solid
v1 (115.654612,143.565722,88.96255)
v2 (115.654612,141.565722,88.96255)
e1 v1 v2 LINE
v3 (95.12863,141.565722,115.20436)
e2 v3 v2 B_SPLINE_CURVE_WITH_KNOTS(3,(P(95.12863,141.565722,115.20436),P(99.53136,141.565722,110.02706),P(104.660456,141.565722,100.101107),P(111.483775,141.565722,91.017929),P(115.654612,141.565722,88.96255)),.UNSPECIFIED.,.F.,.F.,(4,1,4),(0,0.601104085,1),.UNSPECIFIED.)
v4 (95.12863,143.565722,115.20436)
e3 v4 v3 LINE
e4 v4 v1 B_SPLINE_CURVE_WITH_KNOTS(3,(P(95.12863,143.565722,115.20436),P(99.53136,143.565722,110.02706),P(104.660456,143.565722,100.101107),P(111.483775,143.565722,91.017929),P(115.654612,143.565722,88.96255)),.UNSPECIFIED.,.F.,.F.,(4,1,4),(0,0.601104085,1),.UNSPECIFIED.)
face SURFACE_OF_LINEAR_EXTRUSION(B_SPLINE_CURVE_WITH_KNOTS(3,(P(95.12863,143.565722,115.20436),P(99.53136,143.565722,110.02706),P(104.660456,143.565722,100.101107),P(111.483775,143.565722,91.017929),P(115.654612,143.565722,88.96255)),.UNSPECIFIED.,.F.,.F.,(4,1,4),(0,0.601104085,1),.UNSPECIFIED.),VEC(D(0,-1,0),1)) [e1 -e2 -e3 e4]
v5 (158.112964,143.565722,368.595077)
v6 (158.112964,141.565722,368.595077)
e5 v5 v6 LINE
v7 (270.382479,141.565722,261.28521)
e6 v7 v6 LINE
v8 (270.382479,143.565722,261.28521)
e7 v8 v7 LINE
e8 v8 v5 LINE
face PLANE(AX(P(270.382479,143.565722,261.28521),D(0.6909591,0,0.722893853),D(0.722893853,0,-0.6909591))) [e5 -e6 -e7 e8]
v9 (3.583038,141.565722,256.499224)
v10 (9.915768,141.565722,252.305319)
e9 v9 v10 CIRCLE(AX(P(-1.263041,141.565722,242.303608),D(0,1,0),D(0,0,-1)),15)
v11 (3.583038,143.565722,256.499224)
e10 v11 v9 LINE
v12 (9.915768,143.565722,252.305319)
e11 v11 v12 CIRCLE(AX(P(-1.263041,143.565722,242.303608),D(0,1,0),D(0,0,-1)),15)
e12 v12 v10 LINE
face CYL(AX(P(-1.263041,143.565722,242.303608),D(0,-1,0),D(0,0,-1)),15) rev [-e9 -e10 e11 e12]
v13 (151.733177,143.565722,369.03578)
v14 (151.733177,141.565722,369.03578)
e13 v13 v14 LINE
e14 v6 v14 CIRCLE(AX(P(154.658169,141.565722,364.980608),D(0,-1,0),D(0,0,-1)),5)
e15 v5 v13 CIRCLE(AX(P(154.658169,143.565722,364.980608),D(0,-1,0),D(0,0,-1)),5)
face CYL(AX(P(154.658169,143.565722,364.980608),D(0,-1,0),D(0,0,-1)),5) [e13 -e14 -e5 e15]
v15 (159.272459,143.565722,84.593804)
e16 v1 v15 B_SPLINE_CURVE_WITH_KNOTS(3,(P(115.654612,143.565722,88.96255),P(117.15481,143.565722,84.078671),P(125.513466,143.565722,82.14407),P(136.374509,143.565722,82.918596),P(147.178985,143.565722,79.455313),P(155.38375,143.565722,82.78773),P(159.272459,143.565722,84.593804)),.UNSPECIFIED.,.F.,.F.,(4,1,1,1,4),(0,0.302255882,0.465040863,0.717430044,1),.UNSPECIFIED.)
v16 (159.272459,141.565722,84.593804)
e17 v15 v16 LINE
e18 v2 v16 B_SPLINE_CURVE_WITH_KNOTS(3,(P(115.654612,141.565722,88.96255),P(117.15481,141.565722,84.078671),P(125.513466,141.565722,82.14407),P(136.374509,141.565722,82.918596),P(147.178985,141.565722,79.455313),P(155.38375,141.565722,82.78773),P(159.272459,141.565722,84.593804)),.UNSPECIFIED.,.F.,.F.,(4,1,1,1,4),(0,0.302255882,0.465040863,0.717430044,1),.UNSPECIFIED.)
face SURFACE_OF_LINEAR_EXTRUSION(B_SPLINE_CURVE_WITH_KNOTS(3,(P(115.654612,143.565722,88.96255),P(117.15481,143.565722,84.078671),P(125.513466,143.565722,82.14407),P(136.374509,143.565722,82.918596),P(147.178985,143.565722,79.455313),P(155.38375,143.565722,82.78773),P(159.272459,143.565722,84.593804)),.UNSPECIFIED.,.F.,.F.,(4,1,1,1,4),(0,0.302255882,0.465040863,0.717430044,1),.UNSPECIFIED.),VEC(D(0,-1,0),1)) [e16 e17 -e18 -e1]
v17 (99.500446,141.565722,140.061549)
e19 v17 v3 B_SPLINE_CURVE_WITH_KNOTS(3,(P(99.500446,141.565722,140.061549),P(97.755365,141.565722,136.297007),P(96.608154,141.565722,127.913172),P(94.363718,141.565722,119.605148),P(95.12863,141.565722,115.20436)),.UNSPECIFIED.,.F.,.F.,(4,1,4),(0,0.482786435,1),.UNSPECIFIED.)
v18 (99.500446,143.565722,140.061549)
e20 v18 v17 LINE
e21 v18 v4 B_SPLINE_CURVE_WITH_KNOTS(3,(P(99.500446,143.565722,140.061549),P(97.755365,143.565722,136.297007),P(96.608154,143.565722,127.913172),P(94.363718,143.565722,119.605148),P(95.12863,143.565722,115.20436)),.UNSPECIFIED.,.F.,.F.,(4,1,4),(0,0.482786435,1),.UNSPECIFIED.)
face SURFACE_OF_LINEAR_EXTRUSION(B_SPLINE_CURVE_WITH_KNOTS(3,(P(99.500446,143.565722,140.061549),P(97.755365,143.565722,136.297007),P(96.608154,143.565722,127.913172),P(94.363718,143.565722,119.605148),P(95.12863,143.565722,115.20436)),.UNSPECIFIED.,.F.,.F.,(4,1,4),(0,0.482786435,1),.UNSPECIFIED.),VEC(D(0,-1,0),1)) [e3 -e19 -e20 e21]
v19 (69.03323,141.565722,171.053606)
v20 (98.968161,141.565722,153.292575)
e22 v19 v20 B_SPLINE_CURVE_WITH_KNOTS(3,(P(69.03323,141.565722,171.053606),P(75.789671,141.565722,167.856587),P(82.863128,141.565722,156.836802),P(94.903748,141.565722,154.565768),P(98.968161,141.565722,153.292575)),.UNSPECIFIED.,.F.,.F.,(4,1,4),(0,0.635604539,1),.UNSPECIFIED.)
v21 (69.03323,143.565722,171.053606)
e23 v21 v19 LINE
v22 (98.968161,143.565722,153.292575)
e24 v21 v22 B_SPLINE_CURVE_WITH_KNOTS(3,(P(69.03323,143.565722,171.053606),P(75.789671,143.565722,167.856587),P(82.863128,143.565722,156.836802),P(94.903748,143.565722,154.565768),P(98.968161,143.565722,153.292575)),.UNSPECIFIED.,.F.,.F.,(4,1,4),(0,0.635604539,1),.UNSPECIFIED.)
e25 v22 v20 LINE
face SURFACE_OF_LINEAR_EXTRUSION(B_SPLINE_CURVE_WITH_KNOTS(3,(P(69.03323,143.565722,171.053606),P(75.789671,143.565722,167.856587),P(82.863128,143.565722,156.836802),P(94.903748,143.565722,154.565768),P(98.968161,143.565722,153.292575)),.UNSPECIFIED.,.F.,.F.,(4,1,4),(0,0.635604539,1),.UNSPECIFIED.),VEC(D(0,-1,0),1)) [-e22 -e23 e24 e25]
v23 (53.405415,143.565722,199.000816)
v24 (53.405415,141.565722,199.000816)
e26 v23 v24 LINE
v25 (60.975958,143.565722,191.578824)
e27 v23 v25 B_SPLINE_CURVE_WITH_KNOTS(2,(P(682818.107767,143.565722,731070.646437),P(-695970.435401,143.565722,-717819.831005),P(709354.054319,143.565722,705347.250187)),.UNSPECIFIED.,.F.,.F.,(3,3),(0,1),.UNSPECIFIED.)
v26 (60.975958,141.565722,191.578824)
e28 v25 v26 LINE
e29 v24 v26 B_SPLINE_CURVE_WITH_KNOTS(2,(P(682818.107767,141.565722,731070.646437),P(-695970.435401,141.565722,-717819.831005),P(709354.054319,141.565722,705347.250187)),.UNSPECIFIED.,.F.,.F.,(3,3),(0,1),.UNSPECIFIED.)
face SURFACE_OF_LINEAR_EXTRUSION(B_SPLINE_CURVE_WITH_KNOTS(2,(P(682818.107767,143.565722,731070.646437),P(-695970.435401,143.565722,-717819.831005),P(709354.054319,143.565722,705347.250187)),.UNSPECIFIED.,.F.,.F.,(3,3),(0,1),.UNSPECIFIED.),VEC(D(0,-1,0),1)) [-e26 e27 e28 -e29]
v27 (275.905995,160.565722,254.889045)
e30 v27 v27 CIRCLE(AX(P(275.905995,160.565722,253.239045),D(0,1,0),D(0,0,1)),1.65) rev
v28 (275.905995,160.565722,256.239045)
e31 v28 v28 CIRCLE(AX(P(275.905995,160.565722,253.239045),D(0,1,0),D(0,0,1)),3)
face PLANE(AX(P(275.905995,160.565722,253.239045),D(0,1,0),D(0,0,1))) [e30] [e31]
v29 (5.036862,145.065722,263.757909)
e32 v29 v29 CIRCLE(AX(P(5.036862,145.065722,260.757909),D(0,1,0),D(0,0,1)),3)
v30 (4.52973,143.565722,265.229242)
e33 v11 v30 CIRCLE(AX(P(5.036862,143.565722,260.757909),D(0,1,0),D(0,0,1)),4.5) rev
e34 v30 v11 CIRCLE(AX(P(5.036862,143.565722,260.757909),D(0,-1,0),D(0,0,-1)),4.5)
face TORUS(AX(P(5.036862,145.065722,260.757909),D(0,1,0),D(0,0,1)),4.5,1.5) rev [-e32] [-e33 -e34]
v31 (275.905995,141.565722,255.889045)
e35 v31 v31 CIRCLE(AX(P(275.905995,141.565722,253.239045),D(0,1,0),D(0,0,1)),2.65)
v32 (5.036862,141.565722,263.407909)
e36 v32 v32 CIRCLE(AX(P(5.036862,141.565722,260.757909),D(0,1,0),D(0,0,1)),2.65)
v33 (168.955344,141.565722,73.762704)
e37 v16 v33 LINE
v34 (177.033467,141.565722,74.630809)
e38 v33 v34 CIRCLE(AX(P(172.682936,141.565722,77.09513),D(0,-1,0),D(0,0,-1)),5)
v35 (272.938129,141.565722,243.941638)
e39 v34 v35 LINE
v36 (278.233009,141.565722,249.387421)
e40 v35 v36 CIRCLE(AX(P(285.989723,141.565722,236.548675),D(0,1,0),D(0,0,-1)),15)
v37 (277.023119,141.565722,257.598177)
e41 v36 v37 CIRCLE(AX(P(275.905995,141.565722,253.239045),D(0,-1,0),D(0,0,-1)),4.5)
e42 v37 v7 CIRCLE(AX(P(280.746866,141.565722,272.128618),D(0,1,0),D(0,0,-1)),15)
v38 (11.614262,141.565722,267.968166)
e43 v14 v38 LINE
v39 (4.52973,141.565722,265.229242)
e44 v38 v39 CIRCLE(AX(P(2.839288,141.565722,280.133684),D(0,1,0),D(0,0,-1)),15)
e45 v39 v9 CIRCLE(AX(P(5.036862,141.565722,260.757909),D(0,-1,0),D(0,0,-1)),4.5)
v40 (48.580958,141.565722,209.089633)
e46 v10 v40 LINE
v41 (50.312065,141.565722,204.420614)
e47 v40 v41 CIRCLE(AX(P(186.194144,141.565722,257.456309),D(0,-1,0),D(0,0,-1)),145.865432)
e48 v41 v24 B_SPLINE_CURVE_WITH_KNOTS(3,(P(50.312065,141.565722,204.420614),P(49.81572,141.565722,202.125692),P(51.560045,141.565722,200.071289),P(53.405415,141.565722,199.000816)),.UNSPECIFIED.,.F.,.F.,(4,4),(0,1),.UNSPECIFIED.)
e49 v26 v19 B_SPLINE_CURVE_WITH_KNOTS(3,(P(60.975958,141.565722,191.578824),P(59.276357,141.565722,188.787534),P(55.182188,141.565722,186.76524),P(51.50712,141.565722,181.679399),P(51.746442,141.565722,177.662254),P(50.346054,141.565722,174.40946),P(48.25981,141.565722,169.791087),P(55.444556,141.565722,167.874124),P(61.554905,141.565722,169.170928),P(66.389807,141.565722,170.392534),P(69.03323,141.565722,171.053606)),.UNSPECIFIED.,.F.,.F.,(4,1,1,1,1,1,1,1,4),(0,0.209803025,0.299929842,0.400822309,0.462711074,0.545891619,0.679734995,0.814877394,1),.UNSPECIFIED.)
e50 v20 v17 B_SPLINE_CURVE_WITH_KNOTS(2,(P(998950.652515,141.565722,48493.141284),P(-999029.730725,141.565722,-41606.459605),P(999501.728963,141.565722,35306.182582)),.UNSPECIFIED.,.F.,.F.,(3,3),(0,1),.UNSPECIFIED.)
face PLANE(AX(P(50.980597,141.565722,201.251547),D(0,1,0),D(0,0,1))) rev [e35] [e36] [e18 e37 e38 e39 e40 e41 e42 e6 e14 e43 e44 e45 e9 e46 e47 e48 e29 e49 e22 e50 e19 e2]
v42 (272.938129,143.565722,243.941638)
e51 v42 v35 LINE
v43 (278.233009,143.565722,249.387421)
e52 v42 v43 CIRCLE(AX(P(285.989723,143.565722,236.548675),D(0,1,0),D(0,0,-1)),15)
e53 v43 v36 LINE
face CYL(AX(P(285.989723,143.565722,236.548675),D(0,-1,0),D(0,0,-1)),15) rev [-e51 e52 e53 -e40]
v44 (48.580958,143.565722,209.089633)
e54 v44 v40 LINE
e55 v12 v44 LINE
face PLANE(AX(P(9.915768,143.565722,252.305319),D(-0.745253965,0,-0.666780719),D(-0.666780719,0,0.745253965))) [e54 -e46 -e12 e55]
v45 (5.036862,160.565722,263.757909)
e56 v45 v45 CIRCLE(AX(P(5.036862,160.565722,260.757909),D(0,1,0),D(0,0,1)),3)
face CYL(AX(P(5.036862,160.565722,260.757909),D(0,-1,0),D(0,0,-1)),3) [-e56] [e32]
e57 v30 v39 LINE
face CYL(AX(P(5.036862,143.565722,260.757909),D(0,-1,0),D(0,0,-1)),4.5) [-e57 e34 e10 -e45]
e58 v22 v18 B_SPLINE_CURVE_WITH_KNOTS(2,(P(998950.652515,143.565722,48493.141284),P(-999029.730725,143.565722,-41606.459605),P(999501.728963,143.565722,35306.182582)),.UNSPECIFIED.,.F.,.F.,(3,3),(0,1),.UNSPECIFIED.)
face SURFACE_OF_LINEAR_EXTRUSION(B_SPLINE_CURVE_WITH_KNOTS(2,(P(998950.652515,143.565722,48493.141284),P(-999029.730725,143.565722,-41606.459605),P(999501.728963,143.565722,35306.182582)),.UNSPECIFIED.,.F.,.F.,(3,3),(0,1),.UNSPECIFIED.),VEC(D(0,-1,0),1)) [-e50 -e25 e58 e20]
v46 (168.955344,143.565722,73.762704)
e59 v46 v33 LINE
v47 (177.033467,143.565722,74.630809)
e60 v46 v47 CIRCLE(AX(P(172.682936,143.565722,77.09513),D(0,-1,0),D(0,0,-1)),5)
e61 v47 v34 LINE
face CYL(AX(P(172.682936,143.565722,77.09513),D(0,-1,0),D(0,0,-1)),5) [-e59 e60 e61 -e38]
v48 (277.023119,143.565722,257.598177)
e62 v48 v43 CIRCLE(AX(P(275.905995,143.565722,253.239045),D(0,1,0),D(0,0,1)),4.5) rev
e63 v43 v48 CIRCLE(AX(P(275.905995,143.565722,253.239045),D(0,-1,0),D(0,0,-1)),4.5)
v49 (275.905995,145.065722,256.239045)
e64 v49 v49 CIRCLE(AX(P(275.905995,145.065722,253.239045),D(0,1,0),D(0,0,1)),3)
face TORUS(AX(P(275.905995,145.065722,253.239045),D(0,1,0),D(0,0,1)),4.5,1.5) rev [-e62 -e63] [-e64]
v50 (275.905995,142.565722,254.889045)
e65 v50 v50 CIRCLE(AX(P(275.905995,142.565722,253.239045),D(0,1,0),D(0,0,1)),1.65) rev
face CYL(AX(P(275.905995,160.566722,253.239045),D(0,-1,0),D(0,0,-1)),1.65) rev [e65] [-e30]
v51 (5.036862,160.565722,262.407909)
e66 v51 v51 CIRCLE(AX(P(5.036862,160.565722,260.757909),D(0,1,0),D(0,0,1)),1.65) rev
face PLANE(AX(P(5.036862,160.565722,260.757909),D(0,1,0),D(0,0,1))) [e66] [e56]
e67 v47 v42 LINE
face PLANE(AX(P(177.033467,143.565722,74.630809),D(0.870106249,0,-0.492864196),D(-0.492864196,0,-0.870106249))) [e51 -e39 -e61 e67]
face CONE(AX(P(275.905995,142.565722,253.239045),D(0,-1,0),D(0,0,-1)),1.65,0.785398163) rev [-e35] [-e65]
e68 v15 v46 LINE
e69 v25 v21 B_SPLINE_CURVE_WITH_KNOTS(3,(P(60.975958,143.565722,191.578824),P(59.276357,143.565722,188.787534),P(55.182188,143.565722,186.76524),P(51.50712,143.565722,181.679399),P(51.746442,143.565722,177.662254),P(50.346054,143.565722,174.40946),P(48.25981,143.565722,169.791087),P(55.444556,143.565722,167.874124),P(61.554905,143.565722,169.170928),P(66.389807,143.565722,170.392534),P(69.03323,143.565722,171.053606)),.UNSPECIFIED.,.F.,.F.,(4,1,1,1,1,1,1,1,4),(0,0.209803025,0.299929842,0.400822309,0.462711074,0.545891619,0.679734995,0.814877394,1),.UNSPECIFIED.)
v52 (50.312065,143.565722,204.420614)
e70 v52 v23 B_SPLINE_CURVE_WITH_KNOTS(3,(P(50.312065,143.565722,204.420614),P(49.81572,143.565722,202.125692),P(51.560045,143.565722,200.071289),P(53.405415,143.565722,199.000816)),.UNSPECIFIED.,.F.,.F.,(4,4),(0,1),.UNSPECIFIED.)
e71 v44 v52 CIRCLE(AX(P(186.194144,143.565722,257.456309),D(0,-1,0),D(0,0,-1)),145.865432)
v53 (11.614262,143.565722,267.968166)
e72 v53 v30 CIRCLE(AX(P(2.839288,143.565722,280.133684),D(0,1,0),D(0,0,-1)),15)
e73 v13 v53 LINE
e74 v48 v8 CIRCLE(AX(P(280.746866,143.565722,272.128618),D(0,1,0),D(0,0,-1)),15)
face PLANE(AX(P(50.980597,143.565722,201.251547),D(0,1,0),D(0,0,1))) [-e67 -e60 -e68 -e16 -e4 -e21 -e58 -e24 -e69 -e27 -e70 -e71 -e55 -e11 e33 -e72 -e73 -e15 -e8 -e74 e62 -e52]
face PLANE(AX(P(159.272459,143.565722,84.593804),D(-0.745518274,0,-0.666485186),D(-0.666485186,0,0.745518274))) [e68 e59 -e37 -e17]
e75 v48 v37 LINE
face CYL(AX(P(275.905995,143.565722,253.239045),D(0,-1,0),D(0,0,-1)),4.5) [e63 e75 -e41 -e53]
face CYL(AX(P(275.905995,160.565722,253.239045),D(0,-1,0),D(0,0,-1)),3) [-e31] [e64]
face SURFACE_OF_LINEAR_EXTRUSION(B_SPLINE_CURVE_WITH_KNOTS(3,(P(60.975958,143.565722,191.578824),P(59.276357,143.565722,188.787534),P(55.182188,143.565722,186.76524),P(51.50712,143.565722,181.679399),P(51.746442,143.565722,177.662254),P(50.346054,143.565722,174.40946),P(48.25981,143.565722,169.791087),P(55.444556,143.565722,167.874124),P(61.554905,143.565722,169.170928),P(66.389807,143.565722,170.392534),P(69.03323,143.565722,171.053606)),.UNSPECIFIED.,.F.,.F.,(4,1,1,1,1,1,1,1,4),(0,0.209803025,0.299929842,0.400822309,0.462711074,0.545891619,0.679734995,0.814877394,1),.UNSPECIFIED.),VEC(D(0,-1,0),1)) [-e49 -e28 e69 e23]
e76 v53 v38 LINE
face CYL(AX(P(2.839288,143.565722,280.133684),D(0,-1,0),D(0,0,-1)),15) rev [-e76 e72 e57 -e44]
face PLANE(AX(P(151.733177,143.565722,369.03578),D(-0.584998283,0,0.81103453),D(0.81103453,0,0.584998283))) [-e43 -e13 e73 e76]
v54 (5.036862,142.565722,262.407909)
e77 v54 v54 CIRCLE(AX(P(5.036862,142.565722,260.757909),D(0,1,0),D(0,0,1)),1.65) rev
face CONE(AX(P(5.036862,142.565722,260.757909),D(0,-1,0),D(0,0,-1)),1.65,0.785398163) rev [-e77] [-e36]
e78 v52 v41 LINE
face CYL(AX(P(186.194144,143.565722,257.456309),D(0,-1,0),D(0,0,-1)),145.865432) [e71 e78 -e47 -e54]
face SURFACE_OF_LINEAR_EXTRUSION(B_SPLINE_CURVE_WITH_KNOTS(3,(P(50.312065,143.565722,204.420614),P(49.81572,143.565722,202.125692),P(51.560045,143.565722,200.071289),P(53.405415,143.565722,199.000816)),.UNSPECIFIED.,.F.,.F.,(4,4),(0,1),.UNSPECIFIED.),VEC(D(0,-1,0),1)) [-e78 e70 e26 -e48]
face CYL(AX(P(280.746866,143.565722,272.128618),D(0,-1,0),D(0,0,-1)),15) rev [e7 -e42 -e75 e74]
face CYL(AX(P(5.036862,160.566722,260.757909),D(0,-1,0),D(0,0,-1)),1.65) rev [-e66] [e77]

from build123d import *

# Parameters (mm, degrees)
BOSS_EXTRUDE1_DEPTH = 2
SKETCH4_R           = 3
BOSS_EXTRUDE2_DEPTH = 17
FILLET1_R           = 1.5
CUT_EXTRUDE1_REACH  = 466.623
SKETCH5_R           = 1.65
CHAMFER1_SIZE       = 1


with BuildPart() as part:
    # Sketch2 → Boss-Extrude1 (new body)
    with BuildSketch(Plane.XZ.offset(-141.565722281)):
        with BuildLine():
            Line((9.91576806, 252.305318894), (48.580957851, 209.08963313))
            ThreePointArc((48.580957851, 209.08963313), (49.426585926, 206.74773582), (50.312065062, 204.420613874))
            add(Edge.make_bspline(
                [(50.312065062, 204.420613874), (49.815719925, 202.125692192), (51.560044766, 200.071289123), (53.405414889, 199.000816343)],
                knots=[0, 0, 0, 0, 1, 1, 1, 1], degree=3))
            add(Edge.make_bspline(
                [(53.405414889, 199.000816343), (57.076134247, 195.171649715), (60.975957758, 191.578824181)],
                knots=[0, 0, 0, 1, 1, 1], degree=2))
            add(Edge.make_bspline(
                [(60.975957758, 191.578824181), (59.276356799, 188.787533968), (55.182188202, 186.765240329), (51.507120094, 181.679398586), (51.746441808, 177.662253704), (50.346054048, 174.409460226), (48.259810349, 169.791087363), (55.44455623, 167.87412447), (61.554904622, 169.170927623), (66.389807102, 170.392534118), (69.033229794, 171.05360611)],
                knots=[0, 0, 0, 0, 0.209803025, 0.299929842, 0.400822309, 0.462711074, 0.545891619, 0.679734995, 0.814877394, 1, 1, 1, 1], degree=3))
            add(Edge.make_bspline(
                [(69.033229794, 171.05360611), (75.789670793, 167.856586879), (82.863128392, 156.836801796), (94.903748146, 154.565768109), (98.968161166, 153.292574822)],
                knots=[0, 0, 0, 0, 0.635604539, 1, 1, 1, 1], degree=3))
            add(Edge.make_bspline(
                [(98.968161166, 153.292574822), (97.222932023, 146.593007734), (99.500446297, 140.061549094)],
                knots=[0, 0, 0, 1, 1, 1], degree=2))
            add(Edge.make_bspline(
                [(99.500446297, 140.061549094), (97.755365245, 136.29700673), (96.608153873, 127.913172296), (94.363718049, 119.605147548), (95.128629781, 115.204359992)],
                knots=[0, 0, 0, 0, 0.482786435, 1, 1, 1, 1], degree=3))
            add(Edge.make_bspline(
                [(95.128629781, 115.204359992), (99.531359662, 110.027059936), (104.66045627, 100.101106742), (111.48377488, 91.017928675), (115.654612237, 88.962550112)],
                knots=[0, 0, 0, 0, 0.601104085, 1, 1, 1, 1], degree=3))
            add(Edge.make_bspline(
                [(115.654612237, 88.962550112), (117.154809763, 84.078670542), (125.513466275, 82.144069756), (136.374508774, 82.918595796), (147.178985025, 79.455312781), (155.38375, 82.787729708), (159.272458823, 84.593804464)],
                knots=[0, 0, 0, 0, 0.302255882, 0.465040863, 0.717430044, 1, 1, 1, 1], degree=3))
            Line((159.272458823, 84.593804464), (168.955344378, 73.762703811))
            ThreePointArc((168.955344378, 73.762703811), (173.217178272, 72.123753177), (177.033466995, 74.630808761))
            Line((177.033466995, 74.630808761), (272.938128905, 243.941637963))
            ThreePointArc((272.938128905, 243.941637963), (275.235163101, 247.005225563), (278.23300909, 249.387420874))
            ThreePointArc((278.23300909, 249.387420874), (280.35792161, 253.895055054), (277.023119072, 257.598176865))
            ThreePointArc((277.023119072, 257.598176865), (273.465559128, 259.01440507), (270.382479394, 261.285209868))
            Line((270.382479394, 261.285209868), (158.112964228, 368.595076844))
            ThreePointArc((158.112964228, 368.595076844), (155.002737967, 369.968720655), (151.733177312, 369.035780231))
            Line((151.733177312, 369.035780231), (11.614262021, 267.968166154))
            ThreePointArc((11.614262021, 267.968166154), (8.248230389, 266.142853542), (4.529729577, 265.229241593))
            ThreePointArc((4.529729577, 265.229241593), (0.563089763, 261.243048943), (3.583038224, 256.499224057))
            ThreePointArc((3.583038224, 256.499224057), (7.019257656, 254.809747483), (9.91576806, 252.305318894))
        make_face()
    extrude(amount=-BOSS_EXTRUDE1_DEPTH)

    # Sketch4 → Boss-Extrude2 (add)
    with BuildSketch(Plane(origin=(0, 143.565722281, 0), x_dir=(1, 0, 0), z_dir=(0, 1, 0))):
        with Locations(Location((5.036862118, -260.757908841, 0), (0, 0, 270))):
            Circle(SKETCH4_R)
        with Locations(Location((275.905995025, -253.239044628, 0), (0, 0, 270))):
            Circle(SKETCH4_R)
    extrude(amount=BOSS_EXTRUDE2_DEPTH)

    # Fillet1
    fillet1_edges = [part.edges().sort_by_distance(p)[0] for p in [
        (5.036862118, 143.565722281, 257.757908841),
        (275.905995025, 143.565722281, 250.239044628),
    ]]
    fillet(fillet1_edges, radius=FILLET1_R - 0.0001)  # a hair under: the kernel refuses the full size

    # Sketch5 → Cut-Extrude1 (cut, up to next)
    with BuildSketch(Plane.XZ.offset(-141.565722281), mode=Mode.PRIVATE) as cut_extrude1_sk1:
        with Locations(Location((275.905995025, 253.239044628, 0), (0, 0, 270))):
            Circle(SKETCH5_R)
    cut_extrude1_tool1 = extrude(cut_extrude1_sk1.sketch, amount=-CUT_EXTRUDE1_REACH, mode=Mode.PRIVATE) & part.part
    # Sketch5 → Cut-Extrude1 (cut, up to next)
    with BuildSketch(Plane.XZ.offset(-141.565722281), mode=Mode.PRIVATE) as cut_extrude1_sk2:
        with Locations(Location((5.036862118, 260.757908841, 0), (0, 0, 270))):
            Circle(SKETCH5_R)
    cut_extrude1_tool2 = extrude(cut_extrude1_sk2.sketch, amount=-CUT_EXTRUDE1_REACH, mode=Mode.PRIVATE) & part.part
    add(cut_extrude1_tool1.solids().sort_by_distance((275.905995, 141.565722, 253.239045))[0], mode=Mode.SUBTRACT)
    add(cut_extrude1_tool2.solids().sort_by_distance((5.036862, 141.565722, 260.757909))[0], mode=Mode.SUBTRACT)

    # Chamfer1
    chamfer1_edges = [part.edges().sort_by_distance(p)[0] for p in [
        (275.905995025, 141.565722281, 254.889044628),
        (5.036862118, 141.565722281, 262.407908841),
    ]]
    chamfer(chamfer1_edges, length=CHAMFER1_SIZE)


solid = part.part
